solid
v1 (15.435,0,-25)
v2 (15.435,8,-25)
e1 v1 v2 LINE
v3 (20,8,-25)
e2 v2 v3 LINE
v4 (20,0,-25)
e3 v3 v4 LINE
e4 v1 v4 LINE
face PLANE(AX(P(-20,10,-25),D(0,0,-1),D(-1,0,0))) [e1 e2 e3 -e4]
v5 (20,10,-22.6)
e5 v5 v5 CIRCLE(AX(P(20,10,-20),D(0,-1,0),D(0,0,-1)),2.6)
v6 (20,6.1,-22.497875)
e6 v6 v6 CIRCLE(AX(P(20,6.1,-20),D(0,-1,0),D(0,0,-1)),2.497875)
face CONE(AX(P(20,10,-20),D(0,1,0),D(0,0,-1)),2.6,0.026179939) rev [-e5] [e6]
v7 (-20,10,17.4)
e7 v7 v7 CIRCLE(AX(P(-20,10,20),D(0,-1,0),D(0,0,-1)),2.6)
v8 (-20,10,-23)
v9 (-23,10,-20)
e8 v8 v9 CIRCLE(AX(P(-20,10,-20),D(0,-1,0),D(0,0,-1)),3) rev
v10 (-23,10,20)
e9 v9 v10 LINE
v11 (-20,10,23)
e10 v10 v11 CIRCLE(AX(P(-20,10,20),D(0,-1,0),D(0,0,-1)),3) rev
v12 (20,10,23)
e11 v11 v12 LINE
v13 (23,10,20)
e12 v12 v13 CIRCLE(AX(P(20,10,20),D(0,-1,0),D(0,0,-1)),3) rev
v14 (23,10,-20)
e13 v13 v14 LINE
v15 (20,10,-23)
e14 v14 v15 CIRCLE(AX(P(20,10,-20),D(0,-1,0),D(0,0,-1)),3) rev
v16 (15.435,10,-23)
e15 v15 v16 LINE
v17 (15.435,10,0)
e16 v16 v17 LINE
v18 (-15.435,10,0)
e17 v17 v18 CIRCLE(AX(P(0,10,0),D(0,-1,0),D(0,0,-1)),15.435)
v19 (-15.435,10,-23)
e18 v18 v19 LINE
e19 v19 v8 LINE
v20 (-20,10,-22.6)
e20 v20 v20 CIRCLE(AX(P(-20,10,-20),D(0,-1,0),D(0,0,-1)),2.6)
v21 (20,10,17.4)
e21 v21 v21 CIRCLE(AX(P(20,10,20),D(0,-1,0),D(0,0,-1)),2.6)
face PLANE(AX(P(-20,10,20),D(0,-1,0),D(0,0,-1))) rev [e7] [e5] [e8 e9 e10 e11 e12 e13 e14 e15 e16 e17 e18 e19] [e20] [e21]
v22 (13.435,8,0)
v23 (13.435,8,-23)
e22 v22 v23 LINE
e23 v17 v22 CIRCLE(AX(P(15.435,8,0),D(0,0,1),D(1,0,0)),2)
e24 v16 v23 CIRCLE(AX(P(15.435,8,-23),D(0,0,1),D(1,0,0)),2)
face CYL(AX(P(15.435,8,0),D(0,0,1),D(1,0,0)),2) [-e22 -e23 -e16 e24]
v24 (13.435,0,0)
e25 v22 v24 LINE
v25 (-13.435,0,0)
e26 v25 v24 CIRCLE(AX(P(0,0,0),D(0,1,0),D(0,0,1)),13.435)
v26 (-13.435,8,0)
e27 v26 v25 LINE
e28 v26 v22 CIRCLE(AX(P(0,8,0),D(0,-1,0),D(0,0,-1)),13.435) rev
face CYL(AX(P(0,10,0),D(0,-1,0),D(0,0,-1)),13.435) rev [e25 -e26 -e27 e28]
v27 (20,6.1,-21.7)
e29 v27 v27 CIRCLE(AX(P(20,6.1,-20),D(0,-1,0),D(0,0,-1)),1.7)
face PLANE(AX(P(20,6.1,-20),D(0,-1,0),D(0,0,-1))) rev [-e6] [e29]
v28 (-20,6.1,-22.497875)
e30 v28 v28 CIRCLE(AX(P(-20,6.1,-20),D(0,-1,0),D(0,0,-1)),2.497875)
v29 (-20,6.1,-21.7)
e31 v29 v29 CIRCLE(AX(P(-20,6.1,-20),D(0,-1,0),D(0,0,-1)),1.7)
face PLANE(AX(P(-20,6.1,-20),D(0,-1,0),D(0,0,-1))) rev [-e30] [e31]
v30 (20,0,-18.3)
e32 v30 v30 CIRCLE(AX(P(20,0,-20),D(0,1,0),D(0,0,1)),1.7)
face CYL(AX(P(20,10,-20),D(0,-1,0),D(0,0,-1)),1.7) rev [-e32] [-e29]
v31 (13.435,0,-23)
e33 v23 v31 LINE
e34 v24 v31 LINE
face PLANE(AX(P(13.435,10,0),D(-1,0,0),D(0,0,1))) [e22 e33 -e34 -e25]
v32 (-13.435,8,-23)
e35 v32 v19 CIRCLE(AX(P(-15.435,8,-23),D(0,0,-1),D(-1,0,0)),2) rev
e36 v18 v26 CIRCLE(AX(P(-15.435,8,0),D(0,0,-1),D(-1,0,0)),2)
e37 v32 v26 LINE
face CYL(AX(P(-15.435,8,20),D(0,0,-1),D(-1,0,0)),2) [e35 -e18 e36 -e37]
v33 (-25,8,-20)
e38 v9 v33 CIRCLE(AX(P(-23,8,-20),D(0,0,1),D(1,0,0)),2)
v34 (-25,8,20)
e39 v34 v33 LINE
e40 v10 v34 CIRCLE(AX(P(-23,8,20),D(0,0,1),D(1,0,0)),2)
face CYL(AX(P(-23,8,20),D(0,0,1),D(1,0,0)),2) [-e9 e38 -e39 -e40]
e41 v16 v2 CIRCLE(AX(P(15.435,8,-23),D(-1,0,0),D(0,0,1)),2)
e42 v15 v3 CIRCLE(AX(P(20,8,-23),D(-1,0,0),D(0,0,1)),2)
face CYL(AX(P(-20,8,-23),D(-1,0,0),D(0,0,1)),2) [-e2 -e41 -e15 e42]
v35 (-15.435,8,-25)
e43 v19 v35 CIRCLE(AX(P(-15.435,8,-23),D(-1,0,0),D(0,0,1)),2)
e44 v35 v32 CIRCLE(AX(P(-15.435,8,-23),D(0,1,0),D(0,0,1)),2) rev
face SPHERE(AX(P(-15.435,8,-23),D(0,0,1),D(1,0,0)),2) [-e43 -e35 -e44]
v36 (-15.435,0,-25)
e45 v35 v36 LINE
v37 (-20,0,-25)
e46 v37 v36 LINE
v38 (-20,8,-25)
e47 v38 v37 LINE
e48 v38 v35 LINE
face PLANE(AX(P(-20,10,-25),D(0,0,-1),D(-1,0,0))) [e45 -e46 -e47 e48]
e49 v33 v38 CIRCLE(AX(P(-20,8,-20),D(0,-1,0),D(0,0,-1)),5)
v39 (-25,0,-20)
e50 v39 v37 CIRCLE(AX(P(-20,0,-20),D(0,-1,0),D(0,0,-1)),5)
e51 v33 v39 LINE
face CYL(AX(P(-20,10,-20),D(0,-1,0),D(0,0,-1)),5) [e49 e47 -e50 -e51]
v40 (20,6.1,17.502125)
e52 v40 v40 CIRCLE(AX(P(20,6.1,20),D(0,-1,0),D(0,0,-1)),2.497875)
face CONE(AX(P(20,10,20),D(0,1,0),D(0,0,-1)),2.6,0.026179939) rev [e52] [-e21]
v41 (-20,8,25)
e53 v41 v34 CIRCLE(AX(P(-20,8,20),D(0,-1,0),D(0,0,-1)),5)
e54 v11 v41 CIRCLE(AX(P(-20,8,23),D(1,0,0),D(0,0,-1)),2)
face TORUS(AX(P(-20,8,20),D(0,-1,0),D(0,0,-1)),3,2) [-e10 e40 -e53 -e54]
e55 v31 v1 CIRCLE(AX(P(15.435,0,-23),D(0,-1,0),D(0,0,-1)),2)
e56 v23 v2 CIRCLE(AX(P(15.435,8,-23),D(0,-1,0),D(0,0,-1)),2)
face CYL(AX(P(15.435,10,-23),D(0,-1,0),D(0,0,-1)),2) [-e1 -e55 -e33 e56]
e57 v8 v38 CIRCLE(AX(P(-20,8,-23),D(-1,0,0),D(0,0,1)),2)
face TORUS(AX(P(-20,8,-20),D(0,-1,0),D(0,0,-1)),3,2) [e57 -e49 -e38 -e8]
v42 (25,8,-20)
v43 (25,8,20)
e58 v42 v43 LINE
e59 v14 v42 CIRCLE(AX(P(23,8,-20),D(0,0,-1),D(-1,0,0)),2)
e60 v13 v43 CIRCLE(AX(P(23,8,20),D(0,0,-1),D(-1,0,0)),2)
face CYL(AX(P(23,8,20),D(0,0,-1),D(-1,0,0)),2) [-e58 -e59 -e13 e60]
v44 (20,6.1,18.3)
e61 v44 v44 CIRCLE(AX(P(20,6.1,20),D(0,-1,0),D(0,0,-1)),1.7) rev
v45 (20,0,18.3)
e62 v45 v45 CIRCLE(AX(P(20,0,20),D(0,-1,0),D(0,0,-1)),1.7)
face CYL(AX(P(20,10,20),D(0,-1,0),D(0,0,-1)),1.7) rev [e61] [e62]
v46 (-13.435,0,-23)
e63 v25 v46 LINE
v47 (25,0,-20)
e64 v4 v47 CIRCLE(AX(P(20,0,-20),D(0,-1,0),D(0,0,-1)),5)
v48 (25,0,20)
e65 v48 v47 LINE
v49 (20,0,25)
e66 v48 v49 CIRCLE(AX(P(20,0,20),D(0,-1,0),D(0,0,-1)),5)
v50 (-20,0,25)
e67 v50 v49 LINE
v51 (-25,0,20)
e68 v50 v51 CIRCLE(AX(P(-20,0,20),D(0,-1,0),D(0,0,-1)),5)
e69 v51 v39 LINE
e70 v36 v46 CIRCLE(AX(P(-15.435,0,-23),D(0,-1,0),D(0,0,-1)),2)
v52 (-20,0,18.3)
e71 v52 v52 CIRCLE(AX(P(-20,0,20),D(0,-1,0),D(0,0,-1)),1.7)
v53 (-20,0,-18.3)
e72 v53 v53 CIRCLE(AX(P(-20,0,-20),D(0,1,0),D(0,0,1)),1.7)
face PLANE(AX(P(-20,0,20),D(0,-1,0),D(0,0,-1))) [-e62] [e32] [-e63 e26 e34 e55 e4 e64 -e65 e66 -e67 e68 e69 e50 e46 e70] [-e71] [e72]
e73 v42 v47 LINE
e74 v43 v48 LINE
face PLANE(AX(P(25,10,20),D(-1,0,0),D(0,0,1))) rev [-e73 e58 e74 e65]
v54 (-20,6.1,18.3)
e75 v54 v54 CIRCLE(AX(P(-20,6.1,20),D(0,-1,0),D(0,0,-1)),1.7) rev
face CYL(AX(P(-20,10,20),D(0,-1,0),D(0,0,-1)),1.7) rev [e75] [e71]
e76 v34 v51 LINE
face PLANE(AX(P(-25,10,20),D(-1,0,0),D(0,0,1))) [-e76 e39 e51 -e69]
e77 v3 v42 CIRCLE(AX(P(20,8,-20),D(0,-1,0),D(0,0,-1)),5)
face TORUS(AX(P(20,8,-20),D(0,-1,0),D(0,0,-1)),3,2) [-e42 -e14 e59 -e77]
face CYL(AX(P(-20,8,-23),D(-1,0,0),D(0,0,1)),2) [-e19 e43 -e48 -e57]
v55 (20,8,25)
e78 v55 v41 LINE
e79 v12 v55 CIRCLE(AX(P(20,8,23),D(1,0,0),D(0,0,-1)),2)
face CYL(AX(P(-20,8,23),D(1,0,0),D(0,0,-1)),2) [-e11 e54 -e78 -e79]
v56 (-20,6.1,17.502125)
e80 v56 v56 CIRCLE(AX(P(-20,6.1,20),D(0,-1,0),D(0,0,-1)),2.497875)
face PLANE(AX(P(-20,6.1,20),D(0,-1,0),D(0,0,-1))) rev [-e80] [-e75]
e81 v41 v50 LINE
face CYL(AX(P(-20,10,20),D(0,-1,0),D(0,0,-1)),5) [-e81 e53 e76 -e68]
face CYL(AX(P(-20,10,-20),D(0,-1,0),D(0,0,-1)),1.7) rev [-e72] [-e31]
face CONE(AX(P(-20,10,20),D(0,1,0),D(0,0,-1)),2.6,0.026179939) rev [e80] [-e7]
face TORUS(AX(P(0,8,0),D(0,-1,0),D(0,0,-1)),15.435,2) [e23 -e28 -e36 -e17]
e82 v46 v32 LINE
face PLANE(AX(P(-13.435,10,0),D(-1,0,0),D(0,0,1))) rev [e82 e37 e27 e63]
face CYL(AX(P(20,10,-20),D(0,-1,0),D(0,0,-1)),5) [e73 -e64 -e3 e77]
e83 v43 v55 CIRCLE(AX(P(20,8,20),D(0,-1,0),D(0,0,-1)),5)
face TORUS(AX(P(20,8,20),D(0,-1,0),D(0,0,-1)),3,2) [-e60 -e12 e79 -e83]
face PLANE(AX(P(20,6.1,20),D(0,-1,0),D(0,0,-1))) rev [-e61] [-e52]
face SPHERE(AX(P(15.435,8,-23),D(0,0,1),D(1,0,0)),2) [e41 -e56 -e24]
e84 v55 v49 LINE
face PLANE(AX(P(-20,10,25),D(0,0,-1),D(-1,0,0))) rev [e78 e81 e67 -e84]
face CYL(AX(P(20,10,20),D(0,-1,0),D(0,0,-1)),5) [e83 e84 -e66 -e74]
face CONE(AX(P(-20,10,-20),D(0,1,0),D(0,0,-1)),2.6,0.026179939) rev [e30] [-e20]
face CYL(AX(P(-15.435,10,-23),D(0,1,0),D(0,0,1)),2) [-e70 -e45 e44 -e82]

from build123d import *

# Parameters (mm, degrees)
BOSS_EXTRUDE1_DEPTH          = 10
SKETCH1_4_R                  = 1.7
CUT_EXTRUDE1_DEPTH           = 37.742346142
CUT_EXTRUDE2_START           = 10
SKETCH1_5_R                  = 2.6
CUT_EXTRUDE2_DEPTH           = 3.9
CUT_EXTRUDE2_DRAFT           = -1.5
CUT_EXTRUDE2_PROFILE_2_DEPTH = 3.9
CUT_EXTRUDE2_PROFILE_2_DRAFT = -1.5
CUT_EXTRUDE2_PROFILE_3_DEPTH = 3.9
CUT_EXTRUDE2_PROFILE_3_DRAFT = -1.5
CUT_EXTRUDE2_PROFILE_4_DEPTH = 3.9
CUT_EXTRUDE2_PROFILE_4_DRAFT = -1.5
FILLET1_R                    = 2
FILLET2_R                    = 2


with BuildPart() as part:
    # Sketch1 → Boss-Extrude1 (new body)
    with BuildSketch(Plane(origin=(0, 0, 0), x_dir=(1, 0, 0), z_dir=(0, 1, 0))):
        with BuildLine():
            Line((-20, -25), (20, -25))
            ThreePointArc((20, -25), (23.535533906, -23.535533906), (25, -20))
            Line((25, -20), (25, 20))
            ThreePointArc((25, 20), (23.535533906, 23.535533906), (20, 25))
            Line((20, 25), (-20, 25))
            ThreePointArc((-20, 25), (-23.535533906, 23.535533906), (-25, 20))
            Line((-25, 20), (-25, -20))
            ThreePointArc((-25, -20), (-23.535533906, -23.535533906), (-20, -25))
        make_face()
    extrude(amount=BOSS_EXTRUDE1_DEPTH)

    # Sketch1<4> → Cut-Extrude1 (cut, through all)
    with BuildSketch(Plane(origin=(0, 0, 0), x_dir=(1, 0, 0), z_dir=(0, 1, 0))):
        with BuildLine():
            Line((13.435, 25), (-13.435, 25))
            Line((-13.435, 25), (-13.435, 0))
            ThreePointArc((-13.435, 0), (0, -13.435), (13.435, 0))
            Line((13.435, 0), (13.435, 25))
        make_face()
        with Locations(Location((-20, 20, 0), (0, 0, 270))):
            Circle(SKETCH1_4_R)
        with Locations(Location((-20, -20, 0), (0, 0, 90))):
            Circle(SKETCH1_4_R)
        with Locations(Location((20, -20, 0), (0, 0, 90))):
            Circle(SKETCH1_4_R)
        with Locations(Location((20, 20, 0), (0, 0, 270))):
            Circle(SKETCH1_4_R)
    extrude(amount=CUT_EXTRUDE1_DEPTH, mode=Mode.SUBTRACT)


with BuildPart() as cut_extrude2_tool:
    # Sketch1<5> → Cut-Extrude2 (with draft: the straight prism first)
    with BuildSketch(Plane(origin=(0, 0, 0), x_dir=(1, 0, 0), z_dir=(0, 1, 0)).offset(CUT_EXTRUDE2_START)):
        with Locations((-20, 20)):
            Circle(SKETCH1_5_R)
    extrude(amount=-CUT_EXTRUDE2_DEPTH)
    # Cut-Extrude2: the draft: its side faces are tilted about the plane it starts from
    cut_extrude2_sides = [cut_extrude2_tool.faces().sort_by_distance(p)[0] for p in [
        (-22.6, 8.05, -20),
    ]]
    draft(cut_extrude2_sides, Plane(origin=(0, 0, 0), x_dir=(1, 0, 0), z_dir=(0, 1, 0)).offset(CUT_EXTRUDE2_START), CUT_EXTRUDE2_DRAFT)


with BuildPart() as part_1:
    add(part.part)

    # Cut-Extrude2: cut by cut_extrude2_tool
    add(cut_extrude2_tool.part, mode=Mode.SUBTRACT)


with BuildPart() as cut_extrude2_profile_2_tool:
    # Sketch1<5> → Cut-Extrude2 profile 2 (with draft: the straight prism first)
    with BuildSketch(Plane(origin=(0, 0, 0), x_dir=(1, 0, 0), z_dir=(0, 1, 0)).offset(CUT_EXTRUDE2_START)):
        with Locations((20, 20)):
            Circle(SKETCH1_5_R)
    extrude(amount=-CUT_EXTRUDE2_PROFILE_2_DEPTH)
    # Cut-Extrude2 profile 2: the draft: its side faces are tilted about the plane it starts from
    cut_extrude2_profile_2_sides = [cut_extrude2_profile_2_tool.faces().sort_by_distance(p)[0] for p in [
        (17.4, 8.05, -20),
    ]]
    draft(cut_extrude2_profile_2_sides, Plane(origin=(0, 0, 0), x_dir=(1, 0, 0), z_dir=(0, 1, 0)).offset(CUT_EXTRUDE2_START), CUT_EXTRUDE2_PROFILE_2_DRAFT)


with BuildPart() as part_2:
    add(part_1.part)

    # Cut-Extrude2 profile 2: cut by cut_extrude2_profile_2_tool
    add(cut_extrude2_profile_2_tool.part, mode=Mode.SUBTRACT)


with BuildPart() as cut_extrude2_profile_3_tool:
    # Sketch1<5> → Cut-Extrude2 profile 3 (with draft: the straight prism first)
    with BuildSketch(Plane(origin=(0, 0, 0), x_dir=(1, 0, 0), z_dir=(0, 1, 0)).offset(CUT_EXTRUDE2_START)):
        with Locations((-20, -20)):
            Circle(SKETCH1_5_R)
    extrude(amount=-CUT_EXTRUDE2_PROFILE_3_DEPTH)
    # Cut-Extrude2 profile 3: the draft: its side faces are tilted about the plane it starts from
    cut_extrude2_profile_3_sides = [cut_extrude2_profile_3_tool.faces().sort_by_distance(p)[0] for p in [
        (-22.6, 8.05, 20),
    ]]
    draft(cut_extrude2_profile_3_sides, Plane(origin=(0, 0, 0), x_dir=(1, 0, 0), z_dir=(0, 1, 0)).offset(CUT_EXTRUDE2_START), CUT_EXTRUDE2_PROFILE_3_DRAFT)


with BuildPart() as part_3:
    add(part_2.part)

    # Cut-Extrude2 profile 3: cut by cut_extrude2_profile_3_tool
    add(cut_extrude2_profile_3_tool.part, mode=Mode.SUBTRACT)


with BuildPart() as cut_extrude2_profile_4_tool:
    # Sketch1<5> → Cut-Extrude2 profile 4 (with draft: the straight prism first)
    with BuildSketch(Plane(origin=(0, 0, 0), x_dir=(1, 0, 0), z_dir=(0, 1, 0)).offset(CUT_EXTRUDE2_START)):
        with Locations((20, -20)):
            Circle(SKETCH1_5_R)
    extrude(amount=-CUT_EXTRUDE2_PROFILE_4_DEPTH)
    # Cut-Extrude2 profile 4: the draft: its side faces are tilted about the plane it starts from
    cut_extrude2_profile_4_sides = [cut_extrude2_profile_4_tool.faces().sort_by_distance(p)[0] for p in [
        (17.4, 8.05, 20),
    ]]
    draft(cut_extrude2_profile_4_sides, Plane(origin=(0, 0, 0), x_dir=(1, 0, 0), z_dir=(0, 1, 0)).offset(CUT_EXTRUDE2_START), CUT_EXTRUDE2_PROFILE_4_DRAFT)


with BuildPart() as part_4:
    add(part_3.part)

    # Cut-Extrude2 profile 4: cut by cut_extrude2_profile_4_tool
    add(cut_extrude2_profile_4_tool.part, mode=Mode.SUBTRACT)

    # Fillet1
    fillet1_edges = [part_4.edges().sort_by_distance(p)[0] for p in [
        (-13.435, 10, -12.5),
        (-13.435, 5, -25),
        (13.435, 5, -25),
        (0, 10, 13.435),
        (13.435, 10, -12.5),
    ]]
    fillet(fillet1_edges, radius=FILLET1_R)

    # Fillet2
    # the kernel refuses this fillet: 2 mm, written as the material it takes off along each edge
    with BuildSketch(Plane(origin=(15.435, 8, -23), x_dir=(0, 1, 0), z_dir=(0, 0, -1))) as fillet2_piece_1_section:
        Polygon((0, 0), (FILLET2_R, 0), (FILLET2_R, -FILLET2_R), (0, -FILLET2_R), align=None)
    fillet2_piece_1 = extrude(amount=FILLET2_R, mode=Mode.PRIVATE)
    fillet2_piece_1 = fillet2_piece_1 - Plane(origin=(15.435, 8, -23), x_dir=(0.7071067811865475, -0.7071067811865475, 0), z_dir=(0, 0, -1)) * Sphere(FILLET2_R, mode=Mode.PRIVATE)
    add(fillet2_piece_1, mode=Mode.SUBTRACT)
    with BuildSketch(Plane(origin=(-15.435, 8, -23), x_dir=(0, 1, 0), z_dir=(0, 0, -1))) as fillet2_piece_2_section:
        Polygon((0, 0), (FILLET2_R, 0), (FILLET2_R, FILLET2_R), (0, FILLET2_R), align=None)
    fillet2_piece_2 = extrude(amount=FILLET2_R, mode=Mode.PRIVATE)
    fillet2_piece_2 = fillet2_piece_2 - Plane(origin=(-15.435, 8, -23), x_dir=(-0.7071067811865475, -0.7071067811865475, 0), z_dir=(0, 0, -1)) * Sphere(FILLET2_R, mode=Mode.PRIVATE)
    add(fillet2_piece_2, mode=Mode.SUBTRACT)
    with BuildSketch(Plane(origin=(-20, 10, -20), x_dir=(0, 0, -1), z_dir=(1, 0, 0))) as fillet2_piece_3:
        with BuildLine():
            CenterArc((5 - FILLET2_R, -FILLET2_R), FILLET2_R, 0, 90)
            Line((5 - FILLET2_R, 0), (5, 0))
            Line((5, 0), (5, -FILLET2_R))
        make_face()
    revolve(axis=Axis((-20, 10, -20), (0, 1, 0)), revolution_arc=90, mode=Mode.SUBTRACT)
    with BuildSketch(Plane(origin=(-15.435, 10, -25), x_dir=(0, -1, 0), z_dir=(-1, 0, 0)), Plane(origin=(20, 10, -25), x_dir=(0, -1, 0), z_dir=(-1, 0, 0))) as fillet2_piece_4:
        with BuildLine():
            CenterArc((FILLET2_R, FILLET2_R), FILLET2_R, 180, 90)
            Line((0, FILLET2_R), (0, 0))
            Line((0, 0), (FILLET2_R, 0))
        make_face()
    extrude(amount=4.565, mode=Mode.SUBTRACT)
    with BuildSketch(Plane(origin=(20, 10, -20), x_dir=(1, 0, 0), z_dir=(0, 0, 1))) as fillet2_piece_5:
        with BuildLine():
            CenterArc((5 - FILLET2_R, -FILLET2_R), FILLET2_R, 0, 90)
            Line((5 - FILLET2_R, 0), (5, 0))
            Line((5, 0), (5, -FILLET2_R))
        make_face()
    revolve(axis=Axis((20, 10, -20), (0, 1, 0)), revolution_arc=90, mode=Mode.SUBTRACT)
    with BuildSketch(Plane(origin=(25, 10, 20), x_dir=(0, -1, 0), z_dir=(0, 0, -1)), Plane(origin=(-20, 10, 25), x_dir=(0, -1, 0), z_dir=(1, 0, 0)), Plane(origin=(-25, 10, -20), x_dir=(0, -1, 0), z_dir=(0, 0, 1))) as fillet2_piece_6:
        with BuildLine():
            CenterArc((FILLET2_R, FILLET2_R), FILLET2_R, 180, 90)
            Line((0, FILLET2_R), (0, 0))
            Line((0, 0), (FILLET2_R, 0))
        make_face()
    extrude(amount=40, mode=Mode.SUBTRACT)
    with BuildSketch(Plane(origin=(20, 10, 20), x_dir=(0, 0, 1), z_dir=(-1, 0, 0))) as fillet2_piece_7:
        with BuildLine():
            CenterArc((5 - FILLET2_R, -FILLET2_R), FILLET2_R, 0, 90)
            Line((5 - FILLET2_R, 0), (5, 0))
            Line((5, 0), (5, -FILLET2_R))
        make_face()
    revolve(axis=Axis((20, 10, 20), (0, 1, 0)), revolution_arc=90, mode=Mode.SUBTRACT)
    with BuildSketch(Plane(origin=(-20, 10, 20), x_dir=(-1, 0, 0), z_dir=(0, 0, -1))) as fillet2_piece_8:
        with BuildLine():
            CenterArc((5 - FILLET2_R, -FILLET2_R), FILLET2_R, 0, 90)
            Line((5 - FILLET2_R, 0), (5, 0))
            Line((5, 0), (5, -FILLET2_R))
        make_face()
    revolve(axis=Axis((-20, 10, 20), (0, 1, 0)), revolution_arc=90, mode=Mode.SUBTRACT)


solid = part_4.part
